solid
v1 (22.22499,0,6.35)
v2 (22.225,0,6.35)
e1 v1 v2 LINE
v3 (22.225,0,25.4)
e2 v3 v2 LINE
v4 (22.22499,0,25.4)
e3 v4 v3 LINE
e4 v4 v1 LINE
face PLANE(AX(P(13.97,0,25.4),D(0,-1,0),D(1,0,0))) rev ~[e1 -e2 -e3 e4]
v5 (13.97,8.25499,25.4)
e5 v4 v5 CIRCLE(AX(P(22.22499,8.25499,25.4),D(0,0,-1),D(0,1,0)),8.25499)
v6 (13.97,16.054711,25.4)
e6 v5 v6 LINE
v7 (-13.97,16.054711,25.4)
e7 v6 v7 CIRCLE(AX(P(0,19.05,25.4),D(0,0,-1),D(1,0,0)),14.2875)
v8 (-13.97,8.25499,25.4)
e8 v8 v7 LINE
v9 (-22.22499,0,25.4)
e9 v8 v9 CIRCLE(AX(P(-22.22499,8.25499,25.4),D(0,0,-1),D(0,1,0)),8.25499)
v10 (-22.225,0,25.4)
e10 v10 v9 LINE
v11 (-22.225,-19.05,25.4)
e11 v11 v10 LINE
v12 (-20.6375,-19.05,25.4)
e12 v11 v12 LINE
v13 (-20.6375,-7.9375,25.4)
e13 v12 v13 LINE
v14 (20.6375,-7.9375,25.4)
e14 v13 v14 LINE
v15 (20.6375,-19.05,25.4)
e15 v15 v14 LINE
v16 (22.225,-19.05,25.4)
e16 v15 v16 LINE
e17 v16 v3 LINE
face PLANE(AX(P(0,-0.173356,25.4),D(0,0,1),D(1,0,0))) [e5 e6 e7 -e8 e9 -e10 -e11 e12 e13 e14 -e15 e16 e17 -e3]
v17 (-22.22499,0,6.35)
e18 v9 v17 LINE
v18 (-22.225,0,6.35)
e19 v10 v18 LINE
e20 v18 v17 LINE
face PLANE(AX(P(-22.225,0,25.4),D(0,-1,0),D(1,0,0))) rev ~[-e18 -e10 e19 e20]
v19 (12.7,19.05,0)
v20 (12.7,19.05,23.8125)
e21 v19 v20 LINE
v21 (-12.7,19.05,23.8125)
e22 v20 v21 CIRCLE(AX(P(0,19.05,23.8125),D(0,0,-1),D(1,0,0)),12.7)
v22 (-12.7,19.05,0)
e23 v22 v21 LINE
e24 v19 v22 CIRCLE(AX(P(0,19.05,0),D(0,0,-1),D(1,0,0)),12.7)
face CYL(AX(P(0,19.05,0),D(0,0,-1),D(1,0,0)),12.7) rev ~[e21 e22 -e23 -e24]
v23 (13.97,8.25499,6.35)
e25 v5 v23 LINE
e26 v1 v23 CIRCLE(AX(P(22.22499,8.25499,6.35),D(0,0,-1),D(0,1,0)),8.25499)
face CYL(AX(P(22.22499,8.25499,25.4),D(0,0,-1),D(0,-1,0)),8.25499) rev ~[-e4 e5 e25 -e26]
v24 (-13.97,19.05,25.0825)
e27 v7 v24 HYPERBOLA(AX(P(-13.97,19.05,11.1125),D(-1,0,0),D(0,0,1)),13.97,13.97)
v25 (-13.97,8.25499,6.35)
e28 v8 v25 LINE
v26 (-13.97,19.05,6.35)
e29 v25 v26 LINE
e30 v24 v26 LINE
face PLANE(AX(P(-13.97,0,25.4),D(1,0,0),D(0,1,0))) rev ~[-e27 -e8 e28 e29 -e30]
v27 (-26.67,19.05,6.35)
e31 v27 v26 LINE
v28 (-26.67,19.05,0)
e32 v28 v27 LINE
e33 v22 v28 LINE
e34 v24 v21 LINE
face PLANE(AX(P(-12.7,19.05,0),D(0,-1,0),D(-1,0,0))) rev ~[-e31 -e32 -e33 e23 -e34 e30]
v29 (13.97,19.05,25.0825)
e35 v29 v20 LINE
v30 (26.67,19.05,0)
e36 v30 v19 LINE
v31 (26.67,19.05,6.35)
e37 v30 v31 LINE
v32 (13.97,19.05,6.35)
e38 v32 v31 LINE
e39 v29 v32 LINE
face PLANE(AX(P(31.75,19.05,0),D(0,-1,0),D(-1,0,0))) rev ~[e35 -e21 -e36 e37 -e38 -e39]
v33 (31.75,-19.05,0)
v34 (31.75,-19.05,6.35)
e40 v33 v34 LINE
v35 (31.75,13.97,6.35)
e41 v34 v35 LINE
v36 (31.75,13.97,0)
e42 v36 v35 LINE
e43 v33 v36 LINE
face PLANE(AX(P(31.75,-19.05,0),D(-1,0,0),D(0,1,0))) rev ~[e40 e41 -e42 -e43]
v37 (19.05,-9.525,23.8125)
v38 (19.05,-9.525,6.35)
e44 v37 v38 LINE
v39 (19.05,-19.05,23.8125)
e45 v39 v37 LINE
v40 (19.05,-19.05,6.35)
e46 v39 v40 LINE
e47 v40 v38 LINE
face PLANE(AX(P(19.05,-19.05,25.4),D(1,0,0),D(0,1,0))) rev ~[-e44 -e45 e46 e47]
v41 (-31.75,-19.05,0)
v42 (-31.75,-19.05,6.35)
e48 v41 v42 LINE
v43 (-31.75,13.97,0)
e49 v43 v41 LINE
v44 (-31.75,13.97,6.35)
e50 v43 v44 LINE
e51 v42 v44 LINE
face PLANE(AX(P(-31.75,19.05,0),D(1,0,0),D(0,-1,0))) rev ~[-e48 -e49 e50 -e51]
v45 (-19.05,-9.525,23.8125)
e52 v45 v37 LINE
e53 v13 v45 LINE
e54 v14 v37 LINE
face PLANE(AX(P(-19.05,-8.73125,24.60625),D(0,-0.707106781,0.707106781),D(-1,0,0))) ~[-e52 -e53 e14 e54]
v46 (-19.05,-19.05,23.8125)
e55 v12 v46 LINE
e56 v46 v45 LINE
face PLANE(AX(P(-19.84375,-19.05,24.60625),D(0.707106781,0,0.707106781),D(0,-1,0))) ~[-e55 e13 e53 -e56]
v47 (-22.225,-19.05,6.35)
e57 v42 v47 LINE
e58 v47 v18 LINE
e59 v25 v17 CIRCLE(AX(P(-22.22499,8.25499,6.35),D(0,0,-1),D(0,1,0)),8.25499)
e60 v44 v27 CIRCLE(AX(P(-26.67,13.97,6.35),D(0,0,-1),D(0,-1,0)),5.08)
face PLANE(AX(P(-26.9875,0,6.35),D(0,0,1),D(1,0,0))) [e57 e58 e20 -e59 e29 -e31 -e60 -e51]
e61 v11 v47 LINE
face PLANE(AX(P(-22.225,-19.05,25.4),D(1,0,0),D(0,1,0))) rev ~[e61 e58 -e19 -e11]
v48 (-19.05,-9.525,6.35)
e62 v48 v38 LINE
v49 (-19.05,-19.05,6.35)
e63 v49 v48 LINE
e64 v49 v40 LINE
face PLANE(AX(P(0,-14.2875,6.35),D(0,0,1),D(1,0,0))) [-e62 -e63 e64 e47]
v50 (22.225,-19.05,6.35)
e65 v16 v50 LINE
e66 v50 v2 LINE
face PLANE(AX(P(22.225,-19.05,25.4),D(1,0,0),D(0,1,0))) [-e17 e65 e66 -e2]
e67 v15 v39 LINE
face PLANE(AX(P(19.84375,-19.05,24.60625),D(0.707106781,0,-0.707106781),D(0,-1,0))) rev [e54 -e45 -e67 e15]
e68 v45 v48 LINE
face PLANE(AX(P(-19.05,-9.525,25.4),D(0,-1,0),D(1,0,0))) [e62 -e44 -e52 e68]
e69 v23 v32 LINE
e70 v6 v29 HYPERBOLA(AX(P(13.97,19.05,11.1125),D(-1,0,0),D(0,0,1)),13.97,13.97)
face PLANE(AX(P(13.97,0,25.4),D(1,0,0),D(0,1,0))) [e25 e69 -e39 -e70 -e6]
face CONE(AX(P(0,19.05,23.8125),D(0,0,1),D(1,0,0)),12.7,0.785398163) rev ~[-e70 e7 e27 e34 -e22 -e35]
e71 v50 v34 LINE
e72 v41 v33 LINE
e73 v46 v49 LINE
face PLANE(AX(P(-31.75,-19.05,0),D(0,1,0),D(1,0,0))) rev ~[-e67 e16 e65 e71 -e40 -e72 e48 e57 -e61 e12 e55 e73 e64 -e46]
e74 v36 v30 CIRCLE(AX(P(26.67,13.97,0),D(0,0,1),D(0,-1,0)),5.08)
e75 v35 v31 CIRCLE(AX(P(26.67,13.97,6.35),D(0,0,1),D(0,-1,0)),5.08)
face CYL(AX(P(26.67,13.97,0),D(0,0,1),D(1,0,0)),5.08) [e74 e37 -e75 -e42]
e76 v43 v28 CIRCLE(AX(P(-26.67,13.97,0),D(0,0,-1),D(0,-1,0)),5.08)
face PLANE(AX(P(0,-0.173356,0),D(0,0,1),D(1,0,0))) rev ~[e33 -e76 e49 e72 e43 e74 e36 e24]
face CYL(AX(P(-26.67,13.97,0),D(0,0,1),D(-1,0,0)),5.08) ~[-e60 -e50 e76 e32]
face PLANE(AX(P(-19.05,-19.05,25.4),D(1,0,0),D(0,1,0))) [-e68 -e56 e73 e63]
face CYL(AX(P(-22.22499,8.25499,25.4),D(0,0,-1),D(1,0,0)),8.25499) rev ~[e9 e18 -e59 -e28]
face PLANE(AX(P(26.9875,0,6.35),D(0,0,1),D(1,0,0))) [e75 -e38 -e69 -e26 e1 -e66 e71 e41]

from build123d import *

# Parameters (mm, degrees)
F0_R      = 22.5780805595
F5_DEPTH  = 25.4
F6_W      = 9.525
F6_H      = 38.1
F7_DEPTH  = 19.05
F8_R      = 5.08
F9_W      = 9.525
F9_H      = 38.1
F10_DEPTH = 19.05
F11_W     = 38.1
F11_H     = 9.525
F12_DEPTH = 19.05
F14_R     = 5.08
F13_W     = 8.255
F13_H     = 19.05
F15_DEPTH = 19.05
F16_R     = 8.25499
F17_SIZE  = 1.5875


# Not quite as in the source:
# - a fillet or chamfer is up to 0.001 mm smaller than in the source, because OpenCascade refuses the exact size


with BuildPart() as f2:
    # F2: sweep along a path in F1
    with BuildLine(Plane.XZ) as f2_path:
        Line((0, 0), (57.7025674284, 65.8432990313))
    # F0 (on Top) → F2 (sweep)
    with BuildSketch(Plane.XY):
        with Locations((-2.6368375402, 0)):
            Circle(F0_R)
    sweep(path=f2_path.line)


with BuildPart() as f5:
    # F4 (on Top) → F5 (new body)
    with BuildSketch(Plane.XY):
        with BuildLine():
            Line((-31.75, -19.05), (31.75, -19.05))
            Line((31.75, -19.05), (31.75, 19.05))
            Line((31.75, 19.05), (12.7, 19.05))
            ThreePointArc((12.7, 19.05), (0, 6.35), (-12.7, 19.05))
            Line((-12.7, 19.05), (-31.75, 19.05))
            Line((-31.75, 19.05), (-31.75, -19.05))
        make_face()
    extrude(amount=F5_DEPTH)

    # F6 (on face) → F7 (cut)
    with BuildSketch(Plane.XY.offset(25.4)):
        with Locations((26.9875, 0)):
            Rectangle(F6_W, F6_H)
    extrude(amount=-F7_DEPTH, mode=Mode.SUBTRACT)

    # F8
    f8_edges = [f5.edges().sort_by_distance(p)[0] for p in [
        (31.75, 19.05, 3.175),
    ]]
    fillet(f8_edges, radius=F8_R)

    # F9 (on face) → F10 (cut)
    with BuildSketch(Plane.XY.offset(25.4)):
        with Locations((-26.9875, 0)):
            Rectangle(F9_W, F9_H)
    extrude(amount=-F10_DEPTH, mode=Mode.SUBTRACT)

    # F11 (on face) → F12 (cut)
    with BuildSketch(Plane.XY.offset(25.4)):
        with Locations((0, -14.2875)):
            Rectangle(F11_W, F11_H)
    extrude(amount=-F12_DEPTH, mode=Mode.SUBTRACT)

    # F14
    f14_edges = [f5.edges().sort_by_distance(p)[0] for p in [
        (-31.75, 19.05, 3.175),
    ]]
    fillet(f14_edges, radius=F14_R)

    # F13 (on face) → F15 (cut)
    with BuildSketch(Plane.XY.offset(25.4)):
        with Locations((-18.0975, 9.525)):
            Rectangle(F13_W, F13_H)
        with Locations((18.0975, 9.525)):
            Rectangle(F13_W, F13_H)
    extrude(amount=-F15_DEPTH, mode=Mode.SUBTRACT)

    # F16 (radius 8.255 in the source; OpenCascade refuses exactly that, so slightly less here)
    f16_edges = [f5.edges().sort_by_distance(p)[0] for p in [
        (-13.97, 0, 15.875),
        (13.97, 0, 15.875),
    ]]
    fillet(f16_edges, radius=F16_R)

    # F17
    f17_edges = [f5.edges().sort_by_distance(p)[0] for p in [
        (0, 6.35, 25.4),
        (0, -9.525, 25.4),
        (-19.05, -14.2875, 25.4),
        (19.05, -14.2875, 25.4),
    ]]
    chamfer(f17_edges, length=F17_SIZE)


solid = f5.part
